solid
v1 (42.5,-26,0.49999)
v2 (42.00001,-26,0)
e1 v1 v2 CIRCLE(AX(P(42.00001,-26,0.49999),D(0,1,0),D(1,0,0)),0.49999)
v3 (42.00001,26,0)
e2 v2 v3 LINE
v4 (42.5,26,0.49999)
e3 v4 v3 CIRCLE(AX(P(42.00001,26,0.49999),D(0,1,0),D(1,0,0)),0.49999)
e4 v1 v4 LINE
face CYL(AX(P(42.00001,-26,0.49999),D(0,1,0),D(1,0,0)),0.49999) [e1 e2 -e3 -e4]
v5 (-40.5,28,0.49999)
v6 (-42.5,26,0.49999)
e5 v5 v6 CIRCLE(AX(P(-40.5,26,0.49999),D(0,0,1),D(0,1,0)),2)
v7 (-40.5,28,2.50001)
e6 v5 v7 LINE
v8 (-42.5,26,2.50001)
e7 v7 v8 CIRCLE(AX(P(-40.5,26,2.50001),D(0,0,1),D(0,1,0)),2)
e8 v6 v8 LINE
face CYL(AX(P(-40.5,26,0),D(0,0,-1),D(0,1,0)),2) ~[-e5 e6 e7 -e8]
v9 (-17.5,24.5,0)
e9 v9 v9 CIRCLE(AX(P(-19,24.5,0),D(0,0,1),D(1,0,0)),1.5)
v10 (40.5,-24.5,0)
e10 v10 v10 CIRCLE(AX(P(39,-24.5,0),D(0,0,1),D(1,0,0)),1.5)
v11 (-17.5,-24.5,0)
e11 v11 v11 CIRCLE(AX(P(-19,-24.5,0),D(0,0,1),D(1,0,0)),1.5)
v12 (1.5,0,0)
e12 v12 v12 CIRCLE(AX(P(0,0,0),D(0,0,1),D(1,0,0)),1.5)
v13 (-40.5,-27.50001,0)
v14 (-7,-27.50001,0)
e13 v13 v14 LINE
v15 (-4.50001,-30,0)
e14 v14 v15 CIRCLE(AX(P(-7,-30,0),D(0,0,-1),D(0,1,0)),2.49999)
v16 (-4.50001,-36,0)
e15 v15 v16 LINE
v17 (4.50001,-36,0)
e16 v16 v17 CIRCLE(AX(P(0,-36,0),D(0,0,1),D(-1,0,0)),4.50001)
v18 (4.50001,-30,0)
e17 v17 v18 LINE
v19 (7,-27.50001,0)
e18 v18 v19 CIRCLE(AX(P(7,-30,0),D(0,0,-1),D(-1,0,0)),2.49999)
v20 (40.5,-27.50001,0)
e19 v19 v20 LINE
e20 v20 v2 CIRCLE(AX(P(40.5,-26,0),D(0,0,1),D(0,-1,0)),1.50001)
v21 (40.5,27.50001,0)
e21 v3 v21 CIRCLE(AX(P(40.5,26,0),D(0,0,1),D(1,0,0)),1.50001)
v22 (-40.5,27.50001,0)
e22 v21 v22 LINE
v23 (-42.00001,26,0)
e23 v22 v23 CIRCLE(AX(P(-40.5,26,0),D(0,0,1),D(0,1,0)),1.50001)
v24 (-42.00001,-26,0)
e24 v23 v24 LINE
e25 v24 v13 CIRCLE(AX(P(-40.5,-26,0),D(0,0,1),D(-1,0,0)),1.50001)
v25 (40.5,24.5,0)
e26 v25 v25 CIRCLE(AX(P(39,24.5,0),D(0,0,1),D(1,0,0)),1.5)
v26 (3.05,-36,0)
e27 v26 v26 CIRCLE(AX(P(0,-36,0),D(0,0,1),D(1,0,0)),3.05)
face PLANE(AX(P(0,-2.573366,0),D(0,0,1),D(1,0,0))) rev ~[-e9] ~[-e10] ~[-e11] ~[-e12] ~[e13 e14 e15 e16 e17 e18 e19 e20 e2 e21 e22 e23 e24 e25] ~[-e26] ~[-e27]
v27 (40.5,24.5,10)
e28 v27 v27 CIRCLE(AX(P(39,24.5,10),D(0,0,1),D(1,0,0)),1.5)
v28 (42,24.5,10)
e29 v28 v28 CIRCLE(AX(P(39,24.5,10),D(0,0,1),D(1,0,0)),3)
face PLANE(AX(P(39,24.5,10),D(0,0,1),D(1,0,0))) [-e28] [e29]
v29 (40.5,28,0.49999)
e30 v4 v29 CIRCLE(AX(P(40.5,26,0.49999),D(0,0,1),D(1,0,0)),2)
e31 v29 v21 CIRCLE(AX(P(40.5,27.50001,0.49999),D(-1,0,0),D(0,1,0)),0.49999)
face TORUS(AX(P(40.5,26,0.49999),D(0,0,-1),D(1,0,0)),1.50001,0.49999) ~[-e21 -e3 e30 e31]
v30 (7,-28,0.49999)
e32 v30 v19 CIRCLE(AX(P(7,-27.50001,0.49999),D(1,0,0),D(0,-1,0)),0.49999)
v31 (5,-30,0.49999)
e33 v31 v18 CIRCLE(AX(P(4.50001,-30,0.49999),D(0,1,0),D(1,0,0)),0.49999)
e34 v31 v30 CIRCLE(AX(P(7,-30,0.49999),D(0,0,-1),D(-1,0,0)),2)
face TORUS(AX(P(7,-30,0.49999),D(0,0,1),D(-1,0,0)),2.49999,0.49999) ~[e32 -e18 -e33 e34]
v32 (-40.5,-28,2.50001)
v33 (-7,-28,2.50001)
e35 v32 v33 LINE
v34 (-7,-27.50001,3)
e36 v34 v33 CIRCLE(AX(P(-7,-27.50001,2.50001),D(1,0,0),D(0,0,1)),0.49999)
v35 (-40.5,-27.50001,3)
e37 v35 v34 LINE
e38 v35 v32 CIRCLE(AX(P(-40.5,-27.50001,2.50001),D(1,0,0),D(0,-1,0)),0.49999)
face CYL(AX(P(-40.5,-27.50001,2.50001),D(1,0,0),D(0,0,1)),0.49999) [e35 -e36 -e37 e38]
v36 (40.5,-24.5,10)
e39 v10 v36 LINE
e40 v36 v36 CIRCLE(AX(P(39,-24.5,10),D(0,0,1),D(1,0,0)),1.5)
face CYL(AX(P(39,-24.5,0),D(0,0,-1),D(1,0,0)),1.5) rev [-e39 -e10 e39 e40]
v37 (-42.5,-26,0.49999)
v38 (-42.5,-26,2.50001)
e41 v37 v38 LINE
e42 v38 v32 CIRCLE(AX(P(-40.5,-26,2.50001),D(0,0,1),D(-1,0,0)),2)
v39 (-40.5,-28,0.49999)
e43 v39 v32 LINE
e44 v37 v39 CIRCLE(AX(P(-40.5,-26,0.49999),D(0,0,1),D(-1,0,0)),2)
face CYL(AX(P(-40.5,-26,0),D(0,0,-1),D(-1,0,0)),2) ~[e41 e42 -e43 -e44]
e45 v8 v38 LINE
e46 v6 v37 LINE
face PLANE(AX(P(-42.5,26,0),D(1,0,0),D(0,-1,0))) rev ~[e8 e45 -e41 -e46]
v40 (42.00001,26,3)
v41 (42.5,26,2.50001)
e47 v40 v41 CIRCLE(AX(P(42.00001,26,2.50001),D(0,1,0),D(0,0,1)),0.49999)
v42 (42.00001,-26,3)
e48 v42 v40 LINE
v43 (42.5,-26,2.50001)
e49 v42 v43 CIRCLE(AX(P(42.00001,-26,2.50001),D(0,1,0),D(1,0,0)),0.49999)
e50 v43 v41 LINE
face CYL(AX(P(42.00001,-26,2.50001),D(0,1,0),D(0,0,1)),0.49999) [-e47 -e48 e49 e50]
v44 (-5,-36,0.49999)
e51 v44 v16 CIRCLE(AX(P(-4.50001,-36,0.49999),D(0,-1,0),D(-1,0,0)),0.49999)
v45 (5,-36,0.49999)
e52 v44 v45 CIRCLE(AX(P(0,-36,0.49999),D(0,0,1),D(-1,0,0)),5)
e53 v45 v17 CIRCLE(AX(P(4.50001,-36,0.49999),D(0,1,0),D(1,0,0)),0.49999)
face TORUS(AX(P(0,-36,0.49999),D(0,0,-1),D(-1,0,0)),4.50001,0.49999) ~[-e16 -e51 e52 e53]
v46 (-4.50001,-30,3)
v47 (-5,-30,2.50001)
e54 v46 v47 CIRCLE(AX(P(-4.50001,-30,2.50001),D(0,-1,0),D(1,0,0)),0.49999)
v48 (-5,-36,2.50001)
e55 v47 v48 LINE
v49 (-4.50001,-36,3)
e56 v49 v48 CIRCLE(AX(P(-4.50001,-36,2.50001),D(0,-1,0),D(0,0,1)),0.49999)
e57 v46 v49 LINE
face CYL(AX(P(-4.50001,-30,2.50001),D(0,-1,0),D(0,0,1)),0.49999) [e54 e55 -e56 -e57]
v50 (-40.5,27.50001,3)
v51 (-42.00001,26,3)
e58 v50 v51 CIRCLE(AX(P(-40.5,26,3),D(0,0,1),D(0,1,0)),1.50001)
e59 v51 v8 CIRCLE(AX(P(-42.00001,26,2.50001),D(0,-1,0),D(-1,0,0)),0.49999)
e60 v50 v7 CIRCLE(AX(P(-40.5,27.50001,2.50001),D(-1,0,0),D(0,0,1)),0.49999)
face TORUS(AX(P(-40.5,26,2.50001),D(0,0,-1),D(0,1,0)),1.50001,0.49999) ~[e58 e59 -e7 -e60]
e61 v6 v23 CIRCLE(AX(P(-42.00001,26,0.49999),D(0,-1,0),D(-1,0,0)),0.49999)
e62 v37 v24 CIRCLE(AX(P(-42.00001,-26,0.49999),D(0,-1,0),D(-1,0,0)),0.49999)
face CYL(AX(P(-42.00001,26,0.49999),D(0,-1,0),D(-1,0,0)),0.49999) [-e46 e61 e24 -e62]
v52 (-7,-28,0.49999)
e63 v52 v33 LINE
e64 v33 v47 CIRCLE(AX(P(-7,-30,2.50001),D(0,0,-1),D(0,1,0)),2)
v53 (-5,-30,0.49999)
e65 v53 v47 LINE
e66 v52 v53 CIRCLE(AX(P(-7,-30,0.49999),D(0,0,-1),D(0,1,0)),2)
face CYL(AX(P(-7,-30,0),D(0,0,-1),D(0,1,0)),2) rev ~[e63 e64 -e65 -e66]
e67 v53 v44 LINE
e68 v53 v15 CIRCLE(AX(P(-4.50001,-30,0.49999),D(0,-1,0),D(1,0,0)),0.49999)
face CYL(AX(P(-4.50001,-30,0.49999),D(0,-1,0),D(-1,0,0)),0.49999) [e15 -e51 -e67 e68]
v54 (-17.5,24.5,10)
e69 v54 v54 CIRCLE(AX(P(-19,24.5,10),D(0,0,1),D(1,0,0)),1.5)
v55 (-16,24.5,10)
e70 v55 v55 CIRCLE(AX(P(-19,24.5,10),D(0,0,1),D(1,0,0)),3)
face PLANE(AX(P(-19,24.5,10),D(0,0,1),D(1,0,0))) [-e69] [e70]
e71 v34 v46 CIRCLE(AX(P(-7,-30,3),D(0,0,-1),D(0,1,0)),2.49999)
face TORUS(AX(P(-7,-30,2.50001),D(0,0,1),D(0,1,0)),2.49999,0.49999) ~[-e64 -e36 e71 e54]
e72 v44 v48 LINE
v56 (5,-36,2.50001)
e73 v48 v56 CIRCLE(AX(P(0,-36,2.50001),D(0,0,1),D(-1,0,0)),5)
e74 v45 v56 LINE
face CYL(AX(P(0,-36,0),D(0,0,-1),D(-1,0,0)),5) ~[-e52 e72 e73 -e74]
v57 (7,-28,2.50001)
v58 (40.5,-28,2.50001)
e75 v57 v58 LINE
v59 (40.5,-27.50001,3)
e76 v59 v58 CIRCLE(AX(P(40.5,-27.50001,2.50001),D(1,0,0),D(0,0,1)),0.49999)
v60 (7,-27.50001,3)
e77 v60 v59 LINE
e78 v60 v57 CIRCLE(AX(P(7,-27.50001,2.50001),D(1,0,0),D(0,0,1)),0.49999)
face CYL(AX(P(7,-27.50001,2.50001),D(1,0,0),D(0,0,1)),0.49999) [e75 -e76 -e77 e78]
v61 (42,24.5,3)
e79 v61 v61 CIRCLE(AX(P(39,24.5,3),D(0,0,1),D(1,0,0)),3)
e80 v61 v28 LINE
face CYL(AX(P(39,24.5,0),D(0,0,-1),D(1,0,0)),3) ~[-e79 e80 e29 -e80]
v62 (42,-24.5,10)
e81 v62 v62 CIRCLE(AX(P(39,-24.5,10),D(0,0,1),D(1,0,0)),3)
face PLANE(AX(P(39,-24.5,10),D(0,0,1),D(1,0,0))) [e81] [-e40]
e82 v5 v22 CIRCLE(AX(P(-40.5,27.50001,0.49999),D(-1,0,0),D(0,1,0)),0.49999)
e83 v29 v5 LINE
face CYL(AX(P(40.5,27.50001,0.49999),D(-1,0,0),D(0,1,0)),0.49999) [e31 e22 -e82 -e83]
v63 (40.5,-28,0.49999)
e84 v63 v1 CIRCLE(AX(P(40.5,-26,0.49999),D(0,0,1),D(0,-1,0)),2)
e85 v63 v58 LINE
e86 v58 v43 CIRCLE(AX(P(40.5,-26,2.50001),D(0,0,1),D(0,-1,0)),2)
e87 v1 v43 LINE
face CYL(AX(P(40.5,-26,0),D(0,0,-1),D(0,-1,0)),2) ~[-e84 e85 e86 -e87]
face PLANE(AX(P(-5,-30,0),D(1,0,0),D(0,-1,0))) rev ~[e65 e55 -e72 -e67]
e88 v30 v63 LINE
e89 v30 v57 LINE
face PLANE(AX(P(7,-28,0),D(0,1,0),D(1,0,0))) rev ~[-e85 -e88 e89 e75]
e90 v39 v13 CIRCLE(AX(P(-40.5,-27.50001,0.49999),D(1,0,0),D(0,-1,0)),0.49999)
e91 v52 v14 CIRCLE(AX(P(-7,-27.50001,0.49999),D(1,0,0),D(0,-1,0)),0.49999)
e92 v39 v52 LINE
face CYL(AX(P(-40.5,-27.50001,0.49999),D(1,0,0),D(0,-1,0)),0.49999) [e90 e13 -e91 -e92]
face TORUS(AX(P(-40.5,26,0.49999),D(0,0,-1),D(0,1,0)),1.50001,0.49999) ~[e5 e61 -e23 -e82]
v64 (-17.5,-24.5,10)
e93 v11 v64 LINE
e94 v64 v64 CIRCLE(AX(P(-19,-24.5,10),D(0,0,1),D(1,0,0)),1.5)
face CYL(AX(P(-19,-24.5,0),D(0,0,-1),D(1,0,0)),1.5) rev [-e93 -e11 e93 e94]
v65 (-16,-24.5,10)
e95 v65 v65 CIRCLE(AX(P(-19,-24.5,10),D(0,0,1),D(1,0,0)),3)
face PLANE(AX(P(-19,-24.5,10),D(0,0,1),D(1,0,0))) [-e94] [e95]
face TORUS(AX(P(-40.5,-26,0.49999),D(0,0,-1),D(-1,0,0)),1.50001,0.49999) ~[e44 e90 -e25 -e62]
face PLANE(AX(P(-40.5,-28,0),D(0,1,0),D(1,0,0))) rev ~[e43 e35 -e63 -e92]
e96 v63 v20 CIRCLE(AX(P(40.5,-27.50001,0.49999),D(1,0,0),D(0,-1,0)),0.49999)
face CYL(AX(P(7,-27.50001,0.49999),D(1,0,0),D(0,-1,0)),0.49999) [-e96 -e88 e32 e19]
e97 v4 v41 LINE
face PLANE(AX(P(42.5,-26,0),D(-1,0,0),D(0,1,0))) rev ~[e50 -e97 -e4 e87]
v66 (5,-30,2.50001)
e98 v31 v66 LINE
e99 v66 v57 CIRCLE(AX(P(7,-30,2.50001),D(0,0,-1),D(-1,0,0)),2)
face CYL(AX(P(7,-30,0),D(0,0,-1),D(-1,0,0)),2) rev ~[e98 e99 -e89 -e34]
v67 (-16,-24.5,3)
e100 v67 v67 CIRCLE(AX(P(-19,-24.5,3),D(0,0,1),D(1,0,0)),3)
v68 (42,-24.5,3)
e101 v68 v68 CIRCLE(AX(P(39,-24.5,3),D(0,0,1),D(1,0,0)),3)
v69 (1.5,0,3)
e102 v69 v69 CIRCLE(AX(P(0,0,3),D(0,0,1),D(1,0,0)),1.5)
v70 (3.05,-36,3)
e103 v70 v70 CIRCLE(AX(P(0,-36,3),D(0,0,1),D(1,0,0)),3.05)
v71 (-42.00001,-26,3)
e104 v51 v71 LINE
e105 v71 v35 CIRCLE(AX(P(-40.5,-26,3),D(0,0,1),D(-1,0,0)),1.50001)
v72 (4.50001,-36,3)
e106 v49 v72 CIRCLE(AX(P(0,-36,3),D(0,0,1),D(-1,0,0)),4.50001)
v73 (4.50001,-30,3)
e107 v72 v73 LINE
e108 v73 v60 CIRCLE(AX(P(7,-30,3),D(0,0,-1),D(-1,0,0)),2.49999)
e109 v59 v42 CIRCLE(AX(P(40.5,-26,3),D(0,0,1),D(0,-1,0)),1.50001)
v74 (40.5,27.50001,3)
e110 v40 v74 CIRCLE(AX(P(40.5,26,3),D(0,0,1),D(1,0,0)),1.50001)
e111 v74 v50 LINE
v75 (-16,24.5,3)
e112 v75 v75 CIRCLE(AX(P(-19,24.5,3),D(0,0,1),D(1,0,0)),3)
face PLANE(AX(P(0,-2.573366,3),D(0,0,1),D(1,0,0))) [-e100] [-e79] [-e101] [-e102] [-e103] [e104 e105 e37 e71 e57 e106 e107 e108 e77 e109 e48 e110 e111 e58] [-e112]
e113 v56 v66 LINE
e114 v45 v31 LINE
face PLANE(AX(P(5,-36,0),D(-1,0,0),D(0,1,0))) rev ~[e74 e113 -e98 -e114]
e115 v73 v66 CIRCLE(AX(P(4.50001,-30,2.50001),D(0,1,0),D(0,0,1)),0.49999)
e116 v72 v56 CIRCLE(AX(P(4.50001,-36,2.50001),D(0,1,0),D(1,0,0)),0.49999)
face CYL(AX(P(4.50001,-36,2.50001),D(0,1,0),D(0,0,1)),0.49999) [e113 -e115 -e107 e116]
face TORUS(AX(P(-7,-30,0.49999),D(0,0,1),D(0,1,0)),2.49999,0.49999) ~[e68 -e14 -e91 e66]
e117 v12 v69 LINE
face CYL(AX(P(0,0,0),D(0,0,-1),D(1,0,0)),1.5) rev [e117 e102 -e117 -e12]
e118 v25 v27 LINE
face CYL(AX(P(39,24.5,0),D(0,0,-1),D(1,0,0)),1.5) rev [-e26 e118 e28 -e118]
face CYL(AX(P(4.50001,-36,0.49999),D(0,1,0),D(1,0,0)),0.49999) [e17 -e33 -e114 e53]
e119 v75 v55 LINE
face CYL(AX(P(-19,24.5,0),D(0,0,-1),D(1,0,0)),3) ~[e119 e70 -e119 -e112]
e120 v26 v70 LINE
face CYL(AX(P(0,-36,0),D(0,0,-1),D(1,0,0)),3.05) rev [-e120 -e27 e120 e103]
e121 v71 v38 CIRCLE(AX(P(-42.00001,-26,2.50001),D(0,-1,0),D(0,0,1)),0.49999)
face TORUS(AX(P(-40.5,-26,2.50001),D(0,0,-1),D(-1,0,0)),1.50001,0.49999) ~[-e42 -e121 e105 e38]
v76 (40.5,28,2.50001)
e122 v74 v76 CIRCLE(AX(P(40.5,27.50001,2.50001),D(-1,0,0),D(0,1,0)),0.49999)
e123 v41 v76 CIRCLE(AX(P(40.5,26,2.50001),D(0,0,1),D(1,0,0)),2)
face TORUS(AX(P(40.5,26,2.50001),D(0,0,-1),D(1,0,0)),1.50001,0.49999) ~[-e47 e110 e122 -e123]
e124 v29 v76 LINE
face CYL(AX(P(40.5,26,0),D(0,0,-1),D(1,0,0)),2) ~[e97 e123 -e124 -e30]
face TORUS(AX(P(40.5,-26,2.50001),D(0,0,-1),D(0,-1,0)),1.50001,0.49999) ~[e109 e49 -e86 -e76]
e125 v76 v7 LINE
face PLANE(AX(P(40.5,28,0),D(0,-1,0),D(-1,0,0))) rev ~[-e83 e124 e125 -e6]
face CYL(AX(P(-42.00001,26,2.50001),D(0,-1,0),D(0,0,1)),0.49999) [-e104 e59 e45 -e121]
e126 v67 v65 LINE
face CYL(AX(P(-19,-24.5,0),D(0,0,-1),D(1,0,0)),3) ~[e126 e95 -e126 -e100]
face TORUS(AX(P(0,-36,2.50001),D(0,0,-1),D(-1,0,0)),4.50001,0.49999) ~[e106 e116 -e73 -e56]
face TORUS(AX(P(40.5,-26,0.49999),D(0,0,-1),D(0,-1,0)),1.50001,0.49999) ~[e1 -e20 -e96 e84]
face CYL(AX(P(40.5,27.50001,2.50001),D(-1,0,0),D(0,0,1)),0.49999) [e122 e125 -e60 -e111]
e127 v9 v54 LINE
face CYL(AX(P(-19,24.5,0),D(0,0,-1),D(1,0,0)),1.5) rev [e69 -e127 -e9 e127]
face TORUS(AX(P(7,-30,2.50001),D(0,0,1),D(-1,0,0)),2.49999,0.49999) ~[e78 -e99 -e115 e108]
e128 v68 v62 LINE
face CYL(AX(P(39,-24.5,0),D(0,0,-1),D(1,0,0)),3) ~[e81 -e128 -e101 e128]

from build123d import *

# Parameters (mm, degrees)
F0_R     = 3
F0_R_2   = 3.05
F0_R_3   = 1.5
F1_DEPTH = 3
F2_DEPTH = 10
F3_R     = 0.49999


# Not quite as in the source:
# - a fillet or chamfer is up to 0.001 mm smaller than in the source, because OpenCascade refuses the exact size
# - a feature names something its author has since deleted; it is built from what else it names


with BuildPart() as f1:
    # F0 (on Top) → F1 (new body)
    with BuildSketch(Plane.XY):
        with BuildLine():
            ThreePointArc((42.5, 26), (41.9142135624, 27.4142135624), (40.5, 28))
            Line((40.5, 28), (-40.5, 28))
            ThreePointArc((-40.5, 28), (-41.9142135624, 27.4142135624), (-42.5, 26))
            Line((-42.5, 26), (-42.5, -26))
            ThreePointArc((-42.5, -26), (-41.9142135624, -27.4142135624), (-40.5, -28))
            Line((-40.5, -28), (-7, -28))
            ThreePointArc((-7, -28), (-5.5857864376, -28.5857864376), (-5, -30))
            Line((-5, -30), (-5, -36))
            ThreePointArc((-5, -36), (0, -41), (5, -36))
            Line((5, -36), (5, -30))
            ThreePointArc((5, -30), (5.5857864376, -28.5857864376), (7, -28))
            Line((7, -28), (40.5, -28))
            ThreePointArc((40.5, -28), (41.9142135624, -27.4142135624), (42.5, -26))
            Line((42.5, -26), (42.5, 26))
        make_face()
        with Locations((-19, -24.5)):
            Circle(F0_R, mode=Mode.SUBTRACT)
        with Locations((0, -36)):
            Circle(F0_R_2, mode=Mode.SUBTRACT)
        with Locations((39, -24.5)):
            Circle(F0_R, mode=Mode.SUBTRACT)
        with Locations((-19, 24.5)):
            Circle(F0_R, mode=Mode.SUBTRACT)
        Circle(F0_R_3, mode=Mode.SUBTRACT)
        with Locations((39, 24.5)):
            Circle(F0_R, mode=Mode.SUBTRACT)
    extrude(amount=F1_DEPTH)

    # F0 (on Top) → F2 (join)
    with BuildSketch(Plane.XY):
        with Locations((-19, -24.5)):
            Circle(F0_R)
        with Locations((-19, -24.5)):
            Circle(F0_R_3, mode=Mode.SUBTRACT)
        with Locations((-19, 24.5)):
            Circle(F0_R)
        with Locations((-19, 24.5)):
            Circle(F0_R_3, mode=Mode.SUBTRACT)
        with Locations((39, 24.5)):
            Circle(F0_R)
        with Locations((39, 24.5)):
            Circle(F0_R_3, mode=Mode.SUBTRACT)
        with Locations((39, -24.5)):
            Circle(F0_R)
        with Locations((39, -24.5)):
            Circle(F0_R_3, mode=Mode.SUBTRACT)
    extrude(amount=F2_DEPTH)

    # F3 (radius 0.5 in the source; OpenCascade refuses exactly that, so slightly less here)
    f3_edges = [f1.edges().sort_by_distance(p)[0] for p in [
        (23.75, -28, 3),
        (23.75, -28, 0),
    ]]
    fillet(f3_edges, radius=F3_R)


solid = f1.part
